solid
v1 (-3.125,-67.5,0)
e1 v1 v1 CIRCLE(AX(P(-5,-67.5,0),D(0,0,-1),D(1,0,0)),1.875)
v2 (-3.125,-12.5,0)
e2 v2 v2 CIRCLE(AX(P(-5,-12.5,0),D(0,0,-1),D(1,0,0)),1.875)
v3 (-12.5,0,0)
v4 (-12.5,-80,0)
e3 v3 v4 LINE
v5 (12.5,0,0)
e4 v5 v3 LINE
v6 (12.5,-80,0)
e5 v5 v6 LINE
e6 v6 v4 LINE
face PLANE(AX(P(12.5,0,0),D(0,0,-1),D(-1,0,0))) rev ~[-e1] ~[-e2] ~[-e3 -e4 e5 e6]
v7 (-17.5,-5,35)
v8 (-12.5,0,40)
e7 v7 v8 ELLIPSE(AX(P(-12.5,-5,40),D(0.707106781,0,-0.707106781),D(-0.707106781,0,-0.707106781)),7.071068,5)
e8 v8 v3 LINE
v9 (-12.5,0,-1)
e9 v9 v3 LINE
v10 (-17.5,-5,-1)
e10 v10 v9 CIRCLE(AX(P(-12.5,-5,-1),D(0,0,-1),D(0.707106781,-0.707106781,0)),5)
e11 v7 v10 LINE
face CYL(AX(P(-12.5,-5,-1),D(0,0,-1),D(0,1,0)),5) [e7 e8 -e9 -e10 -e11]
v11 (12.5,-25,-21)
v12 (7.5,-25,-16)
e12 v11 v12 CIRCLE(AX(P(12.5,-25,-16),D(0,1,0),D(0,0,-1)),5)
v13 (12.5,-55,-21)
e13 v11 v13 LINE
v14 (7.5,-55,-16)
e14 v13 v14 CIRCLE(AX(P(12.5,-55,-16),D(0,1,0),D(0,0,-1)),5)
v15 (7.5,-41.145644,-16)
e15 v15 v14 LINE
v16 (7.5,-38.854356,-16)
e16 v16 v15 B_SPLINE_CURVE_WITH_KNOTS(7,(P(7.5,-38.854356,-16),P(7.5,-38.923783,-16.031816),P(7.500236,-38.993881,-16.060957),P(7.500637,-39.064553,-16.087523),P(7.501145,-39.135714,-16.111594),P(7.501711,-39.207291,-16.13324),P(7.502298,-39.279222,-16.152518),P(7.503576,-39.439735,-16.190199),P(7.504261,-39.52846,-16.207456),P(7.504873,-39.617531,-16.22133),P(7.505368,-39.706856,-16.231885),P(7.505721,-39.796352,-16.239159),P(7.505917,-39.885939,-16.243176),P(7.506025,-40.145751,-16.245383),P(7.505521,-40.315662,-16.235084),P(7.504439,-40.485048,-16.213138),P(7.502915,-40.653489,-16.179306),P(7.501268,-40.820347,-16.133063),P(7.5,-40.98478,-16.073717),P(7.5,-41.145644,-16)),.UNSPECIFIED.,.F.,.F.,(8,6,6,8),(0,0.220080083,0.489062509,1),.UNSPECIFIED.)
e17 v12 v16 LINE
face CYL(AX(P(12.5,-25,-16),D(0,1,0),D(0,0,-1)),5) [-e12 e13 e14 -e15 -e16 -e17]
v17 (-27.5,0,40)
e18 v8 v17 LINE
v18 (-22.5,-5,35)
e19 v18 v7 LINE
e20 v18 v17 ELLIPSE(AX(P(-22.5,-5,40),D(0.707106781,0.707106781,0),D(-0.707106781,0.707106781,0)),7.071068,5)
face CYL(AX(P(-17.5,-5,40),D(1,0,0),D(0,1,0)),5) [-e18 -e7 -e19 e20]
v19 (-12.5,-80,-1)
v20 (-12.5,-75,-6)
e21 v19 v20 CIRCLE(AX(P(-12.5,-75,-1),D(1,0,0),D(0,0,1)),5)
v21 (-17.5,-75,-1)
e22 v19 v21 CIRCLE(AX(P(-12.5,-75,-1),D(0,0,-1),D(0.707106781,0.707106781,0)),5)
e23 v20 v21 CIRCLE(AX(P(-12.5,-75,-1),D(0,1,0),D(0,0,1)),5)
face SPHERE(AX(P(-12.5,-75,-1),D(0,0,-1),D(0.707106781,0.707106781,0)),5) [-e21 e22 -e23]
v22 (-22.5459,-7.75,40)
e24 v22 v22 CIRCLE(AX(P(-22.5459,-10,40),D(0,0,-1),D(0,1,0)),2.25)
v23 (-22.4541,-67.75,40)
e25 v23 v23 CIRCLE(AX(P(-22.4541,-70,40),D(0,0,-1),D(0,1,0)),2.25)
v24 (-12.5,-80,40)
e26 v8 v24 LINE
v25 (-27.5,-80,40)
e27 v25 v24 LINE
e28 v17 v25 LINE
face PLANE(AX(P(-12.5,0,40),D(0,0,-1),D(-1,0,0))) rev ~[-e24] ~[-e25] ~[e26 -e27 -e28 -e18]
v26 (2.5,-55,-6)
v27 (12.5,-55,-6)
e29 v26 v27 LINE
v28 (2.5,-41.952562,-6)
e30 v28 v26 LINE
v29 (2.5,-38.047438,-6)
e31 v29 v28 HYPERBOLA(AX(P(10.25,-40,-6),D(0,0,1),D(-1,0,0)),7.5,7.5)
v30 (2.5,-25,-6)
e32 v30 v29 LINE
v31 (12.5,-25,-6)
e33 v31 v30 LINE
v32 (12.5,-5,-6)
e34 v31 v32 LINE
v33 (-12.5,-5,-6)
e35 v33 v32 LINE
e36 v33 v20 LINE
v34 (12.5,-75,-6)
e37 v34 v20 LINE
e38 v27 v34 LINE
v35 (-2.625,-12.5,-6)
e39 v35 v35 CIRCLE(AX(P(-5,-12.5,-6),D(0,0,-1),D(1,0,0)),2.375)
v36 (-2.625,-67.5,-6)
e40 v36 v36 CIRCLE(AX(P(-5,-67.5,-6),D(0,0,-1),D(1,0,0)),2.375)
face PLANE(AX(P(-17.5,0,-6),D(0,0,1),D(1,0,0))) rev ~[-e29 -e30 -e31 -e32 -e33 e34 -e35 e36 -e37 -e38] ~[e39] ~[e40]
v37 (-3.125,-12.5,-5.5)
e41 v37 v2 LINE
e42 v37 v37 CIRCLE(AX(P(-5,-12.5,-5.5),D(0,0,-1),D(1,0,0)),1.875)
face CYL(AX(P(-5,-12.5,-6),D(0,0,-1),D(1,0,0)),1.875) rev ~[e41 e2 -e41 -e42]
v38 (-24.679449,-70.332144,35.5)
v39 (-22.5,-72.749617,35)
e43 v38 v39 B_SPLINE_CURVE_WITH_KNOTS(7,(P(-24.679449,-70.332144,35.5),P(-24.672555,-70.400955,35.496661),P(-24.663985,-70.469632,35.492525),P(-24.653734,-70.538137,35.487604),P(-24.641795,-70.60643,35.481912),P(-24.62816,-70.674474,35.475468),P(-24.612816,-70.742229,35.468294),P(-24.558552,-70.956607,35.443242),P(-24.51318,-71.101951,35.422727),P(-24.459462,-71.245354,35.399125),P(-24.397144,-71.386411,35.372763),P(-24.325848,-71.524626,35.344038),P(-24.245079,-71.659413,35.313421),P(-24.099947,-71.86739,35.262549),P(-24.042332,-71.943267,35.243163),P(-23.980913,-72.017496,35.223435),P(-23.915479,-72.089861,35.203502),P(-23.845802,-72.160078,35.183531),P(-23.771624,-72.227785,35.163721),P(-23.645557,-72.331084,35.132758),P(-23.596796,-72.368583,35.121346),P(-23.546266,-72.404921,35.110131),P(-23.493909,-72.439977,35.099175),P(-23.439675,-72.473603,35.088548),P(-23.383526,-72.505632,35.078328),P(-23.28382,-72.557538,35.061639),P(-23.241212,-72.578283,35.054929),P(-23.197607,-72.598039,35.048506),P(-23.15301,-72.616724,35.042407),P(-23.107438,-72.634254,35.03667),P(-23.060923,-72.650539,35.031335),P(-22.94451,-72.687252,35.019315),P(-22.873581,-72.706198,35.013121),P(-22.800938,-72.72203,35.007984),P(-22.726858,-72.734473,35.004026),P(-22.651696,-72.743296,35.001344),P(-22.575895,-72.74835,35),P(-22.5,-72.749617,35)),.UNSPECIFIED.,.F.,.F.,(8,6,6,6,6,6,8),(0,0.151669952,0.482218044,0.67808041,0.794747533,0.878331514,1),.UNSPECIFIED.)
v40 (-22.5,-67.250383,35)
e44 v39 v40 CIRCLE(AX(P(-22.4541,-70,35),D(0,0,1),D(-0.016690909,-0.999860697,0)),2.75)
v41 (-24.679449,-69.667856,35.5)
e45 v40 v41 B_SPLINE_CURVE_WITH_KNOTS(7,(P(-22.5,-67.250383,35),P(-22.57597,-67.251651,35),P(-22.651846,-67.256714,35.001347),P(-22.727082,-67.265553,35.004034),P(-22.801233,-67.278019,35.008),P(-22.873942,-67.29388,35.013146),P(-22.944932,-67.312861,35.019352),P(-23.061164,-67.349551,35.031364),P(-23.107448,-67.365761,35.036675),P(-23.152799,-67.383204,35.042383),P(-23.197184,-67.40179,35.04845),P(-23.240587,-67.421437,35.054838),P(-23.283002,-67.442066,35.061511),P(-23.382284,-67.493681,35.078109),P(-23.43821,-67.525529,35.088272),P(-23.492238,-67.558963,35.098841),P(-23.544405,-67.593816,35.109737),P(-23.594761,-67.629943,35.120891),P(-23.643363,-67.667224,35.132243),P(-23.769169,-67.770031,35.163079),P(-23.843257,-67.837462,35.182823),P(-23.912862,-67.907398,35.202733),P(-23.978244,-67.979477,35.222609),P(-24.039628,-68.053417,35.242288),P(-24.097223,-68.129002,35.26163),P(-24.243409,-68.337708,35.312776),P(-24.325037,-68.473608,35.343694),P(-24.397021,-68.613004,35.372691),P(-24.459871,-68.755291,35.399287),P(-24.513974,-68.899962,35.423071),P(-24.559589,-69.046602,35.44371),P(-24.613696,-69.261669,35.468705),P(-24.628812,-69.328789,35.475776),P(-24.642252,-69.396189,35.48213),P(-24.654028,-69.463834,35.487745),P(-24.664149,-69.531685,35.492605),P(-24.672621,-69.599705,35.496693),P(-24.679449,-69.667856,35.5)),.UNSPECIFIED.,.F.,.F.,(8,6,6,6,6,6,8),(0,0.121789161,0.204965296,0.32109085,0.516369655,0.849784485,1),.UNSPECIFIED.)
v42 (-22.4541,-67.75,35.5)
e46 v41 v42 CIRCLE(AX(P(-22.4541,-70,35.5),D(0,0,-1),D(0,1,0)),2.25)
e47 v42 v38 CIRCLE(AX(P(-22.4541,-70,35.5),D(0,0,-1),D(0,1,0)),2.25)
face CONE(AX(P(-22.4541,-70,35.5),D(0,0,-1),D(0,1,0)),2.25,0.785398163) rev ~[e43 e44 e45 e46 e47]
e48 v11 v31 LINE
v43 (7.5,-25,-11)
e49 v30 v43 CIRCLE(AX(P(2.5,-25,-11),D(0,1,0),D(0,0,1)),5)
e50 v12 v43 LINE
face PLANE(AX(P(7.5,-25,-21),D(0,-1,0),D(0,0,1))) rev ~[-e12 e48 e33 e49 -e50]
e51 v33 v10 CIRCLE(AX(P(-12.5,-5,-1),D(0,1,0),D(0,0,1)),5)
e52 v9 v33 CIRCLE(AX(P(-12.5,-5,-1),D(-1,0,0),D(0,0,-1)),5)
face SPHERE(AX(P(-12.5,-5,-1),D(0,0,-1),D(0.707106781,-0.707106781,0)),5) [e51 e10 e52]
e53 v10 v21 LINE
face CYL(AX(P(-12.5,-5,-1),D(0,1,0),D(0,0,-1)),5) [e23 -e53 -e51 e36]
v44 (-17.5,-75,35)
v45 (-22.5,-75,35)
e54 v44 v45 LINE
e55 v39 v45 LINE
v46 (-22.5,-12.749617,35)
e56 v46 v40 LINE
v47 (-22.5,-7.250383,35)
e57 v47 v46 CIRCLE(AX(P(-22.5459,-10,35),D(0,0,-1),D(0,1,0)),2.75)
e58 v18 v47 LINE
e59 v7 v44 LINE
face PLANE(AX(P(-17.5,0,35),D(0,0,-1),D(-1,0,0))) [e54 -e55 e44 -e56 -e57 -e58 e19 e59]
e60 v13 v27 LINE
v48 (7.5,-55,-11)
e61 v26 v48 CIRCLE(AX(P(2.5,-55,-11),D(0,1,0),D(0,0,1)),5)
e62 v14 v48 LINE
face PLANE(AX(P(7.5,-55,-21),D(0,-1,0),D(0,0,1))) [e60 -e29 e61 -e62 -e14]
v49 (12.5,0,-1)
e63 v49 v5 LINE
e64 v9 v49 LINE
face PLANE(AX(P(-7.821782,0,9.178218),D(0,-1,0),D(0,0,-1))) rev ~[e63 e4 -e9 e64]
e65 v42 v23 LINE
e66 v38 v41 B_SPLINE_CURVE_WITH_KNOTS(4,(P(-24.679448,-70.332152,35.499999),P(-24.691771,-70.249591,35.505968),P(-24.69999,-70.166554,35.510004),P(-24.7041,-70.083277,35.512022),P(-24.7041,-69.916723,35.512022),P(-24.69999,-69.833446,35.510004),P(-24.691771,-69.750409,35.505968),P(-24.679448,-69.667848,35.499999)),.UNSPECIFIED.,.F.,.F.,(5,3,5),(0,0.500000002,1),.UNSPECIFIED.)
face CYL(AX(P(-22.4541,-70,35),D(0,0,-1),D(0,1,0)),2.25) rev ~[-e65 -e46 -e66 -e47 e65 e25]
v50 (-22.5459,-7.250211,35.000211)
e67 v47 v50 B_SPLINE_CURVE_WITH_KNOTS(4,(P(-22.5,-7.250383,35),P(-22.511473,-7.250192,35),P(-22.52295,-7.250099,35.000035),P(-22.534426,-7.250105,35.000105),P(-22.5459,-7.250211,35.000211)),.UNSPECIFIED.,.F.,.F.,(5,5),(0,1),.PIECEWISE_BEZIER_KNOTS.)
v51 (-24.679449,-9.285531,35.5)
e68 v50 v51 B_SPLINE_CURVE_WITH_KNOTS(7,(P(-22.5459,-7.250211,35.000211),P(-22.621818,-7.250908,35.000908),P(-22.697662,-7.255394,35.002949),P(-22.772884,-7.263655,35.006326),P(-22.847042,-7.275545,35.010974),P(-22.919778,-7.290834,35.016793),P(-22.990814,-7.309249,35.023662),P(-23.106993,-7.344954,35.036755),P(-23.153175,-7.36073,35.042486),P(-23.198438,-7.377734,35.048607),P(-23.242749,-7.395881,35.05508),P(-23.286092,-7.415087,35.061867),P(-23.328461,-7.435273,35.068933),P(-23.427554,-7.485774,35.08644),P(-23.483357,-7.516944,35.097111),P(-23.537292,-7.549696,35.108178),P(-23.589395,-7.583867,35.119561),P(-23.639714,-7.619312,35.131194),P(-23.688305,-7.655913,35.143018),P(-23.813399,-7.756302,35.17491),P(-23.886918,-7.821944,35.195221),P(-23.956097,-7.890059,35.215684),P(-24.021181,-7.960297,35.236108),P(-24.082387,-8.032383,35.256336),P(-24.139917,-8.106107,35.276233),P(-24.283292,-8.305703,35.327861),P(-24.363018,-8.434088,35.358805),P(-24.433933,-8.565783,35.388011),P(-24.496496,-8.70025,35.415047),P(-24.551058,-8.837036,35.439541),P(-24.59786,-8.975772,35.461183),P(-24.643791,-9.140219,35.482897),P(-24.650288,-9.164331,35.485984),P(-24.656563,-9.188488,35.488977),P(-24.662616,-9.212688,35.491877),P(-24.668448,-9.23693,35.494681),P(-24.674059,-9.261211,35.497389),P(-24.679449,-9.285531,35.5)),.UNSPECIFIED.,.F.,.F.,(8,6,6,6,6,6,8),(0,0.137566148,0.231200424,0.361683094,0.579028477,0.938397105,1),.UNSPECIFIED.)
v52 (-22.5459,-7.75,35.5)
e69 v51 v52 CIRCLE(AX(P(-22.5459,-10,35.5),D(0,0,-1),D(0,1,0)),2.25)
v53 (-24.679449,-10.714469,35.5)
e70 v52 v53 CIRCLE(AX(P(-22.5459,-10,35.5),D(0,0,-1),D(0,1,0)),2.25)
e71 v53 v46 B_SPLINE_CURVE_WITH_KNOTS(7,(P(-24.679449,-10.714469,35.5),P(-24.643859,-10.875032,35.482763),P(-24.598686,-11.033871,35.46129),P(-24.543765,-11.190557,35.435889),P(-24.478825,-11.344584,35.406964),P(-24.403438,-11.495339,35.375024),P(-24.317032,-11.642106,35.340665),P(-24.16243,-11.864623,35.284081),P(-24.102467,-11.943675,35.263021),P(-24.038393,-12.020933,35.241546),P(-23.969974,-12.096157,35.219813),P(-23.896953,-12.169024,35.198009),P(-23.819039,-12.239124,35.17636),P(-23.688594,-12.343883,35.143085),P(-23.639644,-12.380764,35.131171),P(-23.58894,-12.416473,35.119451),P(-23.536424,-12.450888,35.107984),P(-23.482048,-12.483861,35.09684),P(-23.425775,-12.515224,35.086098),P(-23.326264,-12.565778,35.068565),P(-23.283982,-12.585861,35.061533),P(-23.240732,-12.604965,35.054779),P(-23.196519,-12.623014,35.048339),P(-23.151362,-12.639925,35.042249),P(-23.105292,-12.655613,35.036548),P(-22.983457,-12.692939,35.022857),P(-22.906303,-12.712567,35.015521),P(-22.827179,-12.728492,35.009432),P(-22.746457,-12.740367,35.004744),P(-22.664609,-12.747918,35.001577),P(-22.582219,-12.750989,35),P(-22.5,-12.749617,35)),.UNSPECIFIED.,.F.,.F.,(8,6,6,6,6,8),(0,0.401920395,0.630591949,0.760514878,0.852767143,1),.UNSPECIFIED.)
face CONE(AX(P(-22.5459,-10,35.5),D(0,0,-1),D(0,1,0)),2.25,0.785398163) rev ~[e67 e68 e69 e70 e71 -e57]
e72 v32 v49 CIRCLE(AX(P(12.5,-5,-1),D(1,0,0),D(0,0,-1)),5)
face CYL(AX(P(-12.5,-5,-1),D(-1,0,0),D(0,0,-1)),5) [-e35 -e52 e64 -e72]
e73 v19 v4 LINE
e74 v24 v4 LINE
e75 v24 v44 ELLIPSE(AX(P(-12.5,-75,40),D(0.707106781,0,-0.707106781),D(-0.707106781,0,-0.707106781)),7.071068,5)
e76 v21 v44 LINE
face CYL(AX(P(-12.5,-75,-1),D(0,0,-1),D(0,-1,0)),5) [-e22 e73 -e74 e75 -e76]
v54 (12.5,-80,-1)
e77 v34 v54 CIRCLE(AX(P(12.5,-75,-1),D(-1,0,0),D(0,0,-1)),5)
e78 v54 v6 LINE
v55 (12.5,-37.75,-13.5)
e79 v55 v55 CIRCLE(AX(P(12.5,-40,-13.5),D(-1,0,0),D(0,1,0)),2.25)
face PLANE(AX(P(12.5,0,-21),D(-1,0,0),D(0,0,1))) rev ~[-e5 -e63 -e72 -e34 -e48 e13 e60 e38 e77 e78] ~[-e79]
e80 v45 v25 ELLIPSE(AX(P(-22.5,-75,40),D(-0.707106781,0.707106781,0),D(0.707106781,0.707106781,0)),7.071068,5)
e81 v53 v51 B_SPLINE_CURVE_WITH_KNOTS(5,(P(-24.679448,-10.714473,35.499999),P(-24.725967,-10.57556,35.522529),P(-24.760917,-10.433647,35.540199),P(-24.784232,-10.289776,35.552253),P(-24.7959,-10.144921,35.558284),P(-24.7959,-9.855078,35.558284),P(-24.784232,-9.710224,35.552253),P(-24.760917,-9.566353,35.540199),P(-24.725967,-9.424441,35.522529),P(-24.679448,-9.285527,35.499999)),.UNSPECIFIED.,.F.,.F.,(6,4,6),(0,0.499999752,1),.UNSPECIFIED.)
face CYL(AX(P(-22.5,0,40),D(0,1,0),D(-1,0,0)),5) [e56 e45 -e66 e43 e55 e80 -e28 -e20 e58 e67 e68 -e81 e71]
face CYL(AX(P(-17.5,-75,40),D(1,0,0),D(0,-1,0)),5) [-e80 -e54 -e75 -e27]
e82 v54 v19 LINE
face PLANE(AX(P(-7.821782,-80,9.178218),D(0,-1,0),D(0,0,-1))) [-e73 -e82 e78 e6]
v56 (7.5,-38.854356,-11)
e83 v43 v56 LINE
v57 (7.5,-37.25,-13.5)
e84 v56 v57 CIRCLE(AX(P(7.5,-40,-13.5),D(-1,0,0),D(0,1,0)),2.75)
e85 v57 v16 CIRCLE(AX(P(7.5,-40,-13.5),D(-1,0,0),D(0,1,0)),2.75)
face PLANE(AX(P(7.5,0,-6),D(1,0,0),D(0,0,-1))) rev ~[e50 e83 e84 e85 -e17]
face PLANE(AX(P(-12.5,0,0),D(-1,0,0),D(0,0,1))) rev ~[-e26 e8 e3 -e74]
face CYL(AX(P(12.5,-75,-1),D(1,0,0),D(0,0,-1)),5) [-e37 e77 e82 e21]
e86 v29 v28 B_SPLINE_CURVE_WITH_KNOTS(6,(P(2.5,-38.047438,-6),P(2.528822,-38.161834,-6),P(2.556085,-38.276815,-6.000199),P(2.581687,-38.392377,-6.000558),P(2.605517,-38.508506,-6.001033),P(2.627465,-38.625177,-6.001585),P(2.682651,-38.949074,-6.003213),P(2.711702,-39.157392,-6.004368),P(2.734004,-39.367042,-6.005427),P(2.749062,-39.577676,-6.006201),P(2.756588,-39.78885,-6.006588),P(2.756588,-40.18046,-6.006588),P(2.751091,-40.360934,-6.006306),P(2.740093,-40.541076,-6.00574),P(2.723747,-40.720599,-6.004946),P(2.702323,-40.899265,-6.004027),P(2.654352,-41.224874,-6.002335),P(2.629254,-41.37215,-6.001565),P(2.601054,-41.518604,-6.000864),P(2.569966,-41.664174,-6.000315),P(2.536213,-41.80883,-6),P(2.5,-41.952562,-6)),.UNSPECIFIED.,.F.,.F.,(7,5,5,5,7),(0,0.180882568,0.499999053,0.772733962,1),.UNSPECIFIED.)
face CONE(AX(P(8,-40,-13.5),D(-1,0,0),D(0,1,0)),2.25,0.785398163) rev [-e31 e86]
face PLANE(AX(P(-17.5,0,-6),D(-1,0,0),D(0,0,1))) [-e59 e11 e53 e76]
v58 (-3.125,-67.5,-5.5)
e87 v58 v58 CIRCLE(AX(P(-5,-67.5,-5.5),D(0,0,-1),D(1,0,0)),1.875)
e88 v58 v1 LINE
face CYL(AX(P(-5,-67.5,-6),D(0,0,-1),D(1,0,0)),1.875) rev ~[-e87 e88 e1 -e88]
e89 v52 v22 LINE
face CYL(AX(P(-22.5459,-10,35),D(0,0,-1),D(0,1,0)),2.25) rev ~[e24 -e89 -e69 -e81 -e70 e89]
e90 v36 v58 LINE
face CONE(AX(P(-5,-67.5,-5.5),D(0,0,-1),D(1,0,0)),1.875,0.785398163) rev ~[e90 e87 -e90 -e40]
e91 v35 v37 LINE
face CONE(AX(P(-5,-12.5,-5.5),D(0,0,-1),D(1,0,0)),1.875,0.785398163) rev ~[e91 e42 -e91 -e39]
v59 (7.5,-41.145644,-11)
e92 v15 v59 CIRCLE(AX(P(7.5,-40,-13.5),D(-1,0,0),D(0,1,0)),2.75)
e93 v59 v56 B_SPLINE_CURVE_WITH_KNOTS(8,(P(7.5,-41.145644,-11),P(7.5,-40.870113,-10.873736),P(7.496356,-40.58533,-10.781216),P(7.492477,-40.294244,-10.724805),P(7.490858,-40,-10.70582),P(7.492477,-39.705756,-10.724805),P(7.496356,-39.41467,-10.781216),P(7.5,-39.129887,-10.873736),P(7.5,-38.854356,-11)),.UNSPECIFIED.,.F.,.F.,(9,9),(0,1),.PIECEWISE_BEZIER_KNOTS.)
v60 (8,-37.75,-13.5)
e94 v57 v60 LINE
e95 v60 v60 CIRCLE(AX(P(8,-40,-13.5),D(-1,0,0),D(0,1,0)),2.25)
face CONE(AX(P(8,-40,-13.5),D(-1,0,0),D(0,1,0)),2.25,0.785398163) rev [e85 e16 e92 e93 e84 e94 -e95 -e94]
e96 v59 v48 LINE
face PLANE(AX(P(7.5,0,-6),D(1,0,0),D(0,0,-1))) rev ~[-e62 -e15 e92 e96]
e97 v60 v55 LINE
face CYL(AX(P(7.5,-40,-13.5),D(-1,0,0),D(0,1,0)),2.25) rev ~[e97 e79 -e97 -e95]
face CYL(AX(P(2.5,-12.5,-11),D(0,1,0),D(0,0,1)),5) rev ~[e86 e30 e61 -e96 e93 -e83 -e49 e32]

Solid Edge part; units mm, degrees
sketch "Sketch1" plane through (0, 0, 0) normal (0, -1, 0) x (1, 0, 0)
  line L0 (-17.5, -6) -> (7.5, -6)
  line L1 (7.5, -6) -> (7.5, -21)
  line L2 (7.5, -21) -> (12.5, -21)
  line L3 (12.5, -21) -> (12.5, 0)
  line L4 (12.5, 0) -> (-12.5, 0)
  line L5 (-12.5, 0) -> (-12.5, 40)
  line L6 (-12.5, 40) -> (-27.5, 40)
  line L7 (-27.5, 35) -> (-27.5, 40)
  line L8 (-17.5, 35) -> (-27.5, 35)
  line L9 (-17.5, -6) -> (-17.5, 35)
  dimension "D1" = 5
  dimension "D2" = 6
  dimension "D3" = 15
  dimension "D4" = 40
  dimension "D5" = 10
  dimension "D6" = 40
  dimension "D7" = 5
  dimension "D8" = 5
extrude "Protrusion1" add sketch "Sketch1" along normal blind 80
sketch "Sketch2" plane through (7.5, -40, -13.5) normal (-1, 0, 0) x (0, 1, 0)
  circle A0 centre (0, 0) radius 2.25
extrude "Cutout1" cut sketch "Sketch2" against normal through all
sketch "Sketch3" plane through (-22.5, -40, 35) normal (0, 0, -1) x (0, 1, 0)
  circle A0 centre (-30, 0.0459) radius 2.25
  circle A1 centre (30, -0.0459) radius 2.25
  dimension "D1" = 60
  dimension "D2" = 4.5
extrude "Cutout2" cut sketch "Sketch3" against normal through all
sketch "Sketch4" plane through (-5, -40, -6) normal (0, 0, -1) x (1, 0, 0)
  circle A0 centre (0, 27.5) radius 1.875
  circle A1 centre (0, -27.5) radius 1.875
  dimension "D1" = 55
extrude "Cutout3" cut sketch "Sketch4" against normal through all
sketch "Sketch5" plane through (7.5, -40, -13.5) normal (-1, 0, 0) x (0, 1, 0)
  line L0 (-40, 7.5) -> (-15, 7.5)
  line L1 (-15, 7.5) -> (-15, -7.5)
  line L2 (-15, -7.5) -> (-40, -7.5)
  line L3 (-40, -7.5) -> (-40, 7.5)
  line L4 (40, 7.5) -> (15, 7.5)
  line L5 (15, 7.5) -> (15, -7.5)
  line L6 (15, -7.5) -> (40, -7.5)
  line L7 (40, -7.5) -> (40, 7.5)
  dimension "D1" = 25
extrude "Cutout4" cut sketch "Sketch5" against normal through all
chamfer "Fase_3" distance 0.5 angle 45 5 edges at (-6.875, -67.5, -6) (-6.875, -12.5, -6) (-22.5459, -12.25, 35) (-22.4541, -72.25, 35) (7.5, -42.25, -13.5)
fillet "Verrundung_3" radius 5 10 edges at (-27.5, -40, 35) (-17.5, -40, -6) (7.5, -40, -6) (7.5, -40, -21) (-17.5, -80, 14.5) (-2.5, -80, -6) (-22.5, -80, 35) (-17.5, 0, 14.5) (-22.5, 0, 35) (-2.5, 0, -6)
properties part number "A7.3" material "Nylon, allgemein"
